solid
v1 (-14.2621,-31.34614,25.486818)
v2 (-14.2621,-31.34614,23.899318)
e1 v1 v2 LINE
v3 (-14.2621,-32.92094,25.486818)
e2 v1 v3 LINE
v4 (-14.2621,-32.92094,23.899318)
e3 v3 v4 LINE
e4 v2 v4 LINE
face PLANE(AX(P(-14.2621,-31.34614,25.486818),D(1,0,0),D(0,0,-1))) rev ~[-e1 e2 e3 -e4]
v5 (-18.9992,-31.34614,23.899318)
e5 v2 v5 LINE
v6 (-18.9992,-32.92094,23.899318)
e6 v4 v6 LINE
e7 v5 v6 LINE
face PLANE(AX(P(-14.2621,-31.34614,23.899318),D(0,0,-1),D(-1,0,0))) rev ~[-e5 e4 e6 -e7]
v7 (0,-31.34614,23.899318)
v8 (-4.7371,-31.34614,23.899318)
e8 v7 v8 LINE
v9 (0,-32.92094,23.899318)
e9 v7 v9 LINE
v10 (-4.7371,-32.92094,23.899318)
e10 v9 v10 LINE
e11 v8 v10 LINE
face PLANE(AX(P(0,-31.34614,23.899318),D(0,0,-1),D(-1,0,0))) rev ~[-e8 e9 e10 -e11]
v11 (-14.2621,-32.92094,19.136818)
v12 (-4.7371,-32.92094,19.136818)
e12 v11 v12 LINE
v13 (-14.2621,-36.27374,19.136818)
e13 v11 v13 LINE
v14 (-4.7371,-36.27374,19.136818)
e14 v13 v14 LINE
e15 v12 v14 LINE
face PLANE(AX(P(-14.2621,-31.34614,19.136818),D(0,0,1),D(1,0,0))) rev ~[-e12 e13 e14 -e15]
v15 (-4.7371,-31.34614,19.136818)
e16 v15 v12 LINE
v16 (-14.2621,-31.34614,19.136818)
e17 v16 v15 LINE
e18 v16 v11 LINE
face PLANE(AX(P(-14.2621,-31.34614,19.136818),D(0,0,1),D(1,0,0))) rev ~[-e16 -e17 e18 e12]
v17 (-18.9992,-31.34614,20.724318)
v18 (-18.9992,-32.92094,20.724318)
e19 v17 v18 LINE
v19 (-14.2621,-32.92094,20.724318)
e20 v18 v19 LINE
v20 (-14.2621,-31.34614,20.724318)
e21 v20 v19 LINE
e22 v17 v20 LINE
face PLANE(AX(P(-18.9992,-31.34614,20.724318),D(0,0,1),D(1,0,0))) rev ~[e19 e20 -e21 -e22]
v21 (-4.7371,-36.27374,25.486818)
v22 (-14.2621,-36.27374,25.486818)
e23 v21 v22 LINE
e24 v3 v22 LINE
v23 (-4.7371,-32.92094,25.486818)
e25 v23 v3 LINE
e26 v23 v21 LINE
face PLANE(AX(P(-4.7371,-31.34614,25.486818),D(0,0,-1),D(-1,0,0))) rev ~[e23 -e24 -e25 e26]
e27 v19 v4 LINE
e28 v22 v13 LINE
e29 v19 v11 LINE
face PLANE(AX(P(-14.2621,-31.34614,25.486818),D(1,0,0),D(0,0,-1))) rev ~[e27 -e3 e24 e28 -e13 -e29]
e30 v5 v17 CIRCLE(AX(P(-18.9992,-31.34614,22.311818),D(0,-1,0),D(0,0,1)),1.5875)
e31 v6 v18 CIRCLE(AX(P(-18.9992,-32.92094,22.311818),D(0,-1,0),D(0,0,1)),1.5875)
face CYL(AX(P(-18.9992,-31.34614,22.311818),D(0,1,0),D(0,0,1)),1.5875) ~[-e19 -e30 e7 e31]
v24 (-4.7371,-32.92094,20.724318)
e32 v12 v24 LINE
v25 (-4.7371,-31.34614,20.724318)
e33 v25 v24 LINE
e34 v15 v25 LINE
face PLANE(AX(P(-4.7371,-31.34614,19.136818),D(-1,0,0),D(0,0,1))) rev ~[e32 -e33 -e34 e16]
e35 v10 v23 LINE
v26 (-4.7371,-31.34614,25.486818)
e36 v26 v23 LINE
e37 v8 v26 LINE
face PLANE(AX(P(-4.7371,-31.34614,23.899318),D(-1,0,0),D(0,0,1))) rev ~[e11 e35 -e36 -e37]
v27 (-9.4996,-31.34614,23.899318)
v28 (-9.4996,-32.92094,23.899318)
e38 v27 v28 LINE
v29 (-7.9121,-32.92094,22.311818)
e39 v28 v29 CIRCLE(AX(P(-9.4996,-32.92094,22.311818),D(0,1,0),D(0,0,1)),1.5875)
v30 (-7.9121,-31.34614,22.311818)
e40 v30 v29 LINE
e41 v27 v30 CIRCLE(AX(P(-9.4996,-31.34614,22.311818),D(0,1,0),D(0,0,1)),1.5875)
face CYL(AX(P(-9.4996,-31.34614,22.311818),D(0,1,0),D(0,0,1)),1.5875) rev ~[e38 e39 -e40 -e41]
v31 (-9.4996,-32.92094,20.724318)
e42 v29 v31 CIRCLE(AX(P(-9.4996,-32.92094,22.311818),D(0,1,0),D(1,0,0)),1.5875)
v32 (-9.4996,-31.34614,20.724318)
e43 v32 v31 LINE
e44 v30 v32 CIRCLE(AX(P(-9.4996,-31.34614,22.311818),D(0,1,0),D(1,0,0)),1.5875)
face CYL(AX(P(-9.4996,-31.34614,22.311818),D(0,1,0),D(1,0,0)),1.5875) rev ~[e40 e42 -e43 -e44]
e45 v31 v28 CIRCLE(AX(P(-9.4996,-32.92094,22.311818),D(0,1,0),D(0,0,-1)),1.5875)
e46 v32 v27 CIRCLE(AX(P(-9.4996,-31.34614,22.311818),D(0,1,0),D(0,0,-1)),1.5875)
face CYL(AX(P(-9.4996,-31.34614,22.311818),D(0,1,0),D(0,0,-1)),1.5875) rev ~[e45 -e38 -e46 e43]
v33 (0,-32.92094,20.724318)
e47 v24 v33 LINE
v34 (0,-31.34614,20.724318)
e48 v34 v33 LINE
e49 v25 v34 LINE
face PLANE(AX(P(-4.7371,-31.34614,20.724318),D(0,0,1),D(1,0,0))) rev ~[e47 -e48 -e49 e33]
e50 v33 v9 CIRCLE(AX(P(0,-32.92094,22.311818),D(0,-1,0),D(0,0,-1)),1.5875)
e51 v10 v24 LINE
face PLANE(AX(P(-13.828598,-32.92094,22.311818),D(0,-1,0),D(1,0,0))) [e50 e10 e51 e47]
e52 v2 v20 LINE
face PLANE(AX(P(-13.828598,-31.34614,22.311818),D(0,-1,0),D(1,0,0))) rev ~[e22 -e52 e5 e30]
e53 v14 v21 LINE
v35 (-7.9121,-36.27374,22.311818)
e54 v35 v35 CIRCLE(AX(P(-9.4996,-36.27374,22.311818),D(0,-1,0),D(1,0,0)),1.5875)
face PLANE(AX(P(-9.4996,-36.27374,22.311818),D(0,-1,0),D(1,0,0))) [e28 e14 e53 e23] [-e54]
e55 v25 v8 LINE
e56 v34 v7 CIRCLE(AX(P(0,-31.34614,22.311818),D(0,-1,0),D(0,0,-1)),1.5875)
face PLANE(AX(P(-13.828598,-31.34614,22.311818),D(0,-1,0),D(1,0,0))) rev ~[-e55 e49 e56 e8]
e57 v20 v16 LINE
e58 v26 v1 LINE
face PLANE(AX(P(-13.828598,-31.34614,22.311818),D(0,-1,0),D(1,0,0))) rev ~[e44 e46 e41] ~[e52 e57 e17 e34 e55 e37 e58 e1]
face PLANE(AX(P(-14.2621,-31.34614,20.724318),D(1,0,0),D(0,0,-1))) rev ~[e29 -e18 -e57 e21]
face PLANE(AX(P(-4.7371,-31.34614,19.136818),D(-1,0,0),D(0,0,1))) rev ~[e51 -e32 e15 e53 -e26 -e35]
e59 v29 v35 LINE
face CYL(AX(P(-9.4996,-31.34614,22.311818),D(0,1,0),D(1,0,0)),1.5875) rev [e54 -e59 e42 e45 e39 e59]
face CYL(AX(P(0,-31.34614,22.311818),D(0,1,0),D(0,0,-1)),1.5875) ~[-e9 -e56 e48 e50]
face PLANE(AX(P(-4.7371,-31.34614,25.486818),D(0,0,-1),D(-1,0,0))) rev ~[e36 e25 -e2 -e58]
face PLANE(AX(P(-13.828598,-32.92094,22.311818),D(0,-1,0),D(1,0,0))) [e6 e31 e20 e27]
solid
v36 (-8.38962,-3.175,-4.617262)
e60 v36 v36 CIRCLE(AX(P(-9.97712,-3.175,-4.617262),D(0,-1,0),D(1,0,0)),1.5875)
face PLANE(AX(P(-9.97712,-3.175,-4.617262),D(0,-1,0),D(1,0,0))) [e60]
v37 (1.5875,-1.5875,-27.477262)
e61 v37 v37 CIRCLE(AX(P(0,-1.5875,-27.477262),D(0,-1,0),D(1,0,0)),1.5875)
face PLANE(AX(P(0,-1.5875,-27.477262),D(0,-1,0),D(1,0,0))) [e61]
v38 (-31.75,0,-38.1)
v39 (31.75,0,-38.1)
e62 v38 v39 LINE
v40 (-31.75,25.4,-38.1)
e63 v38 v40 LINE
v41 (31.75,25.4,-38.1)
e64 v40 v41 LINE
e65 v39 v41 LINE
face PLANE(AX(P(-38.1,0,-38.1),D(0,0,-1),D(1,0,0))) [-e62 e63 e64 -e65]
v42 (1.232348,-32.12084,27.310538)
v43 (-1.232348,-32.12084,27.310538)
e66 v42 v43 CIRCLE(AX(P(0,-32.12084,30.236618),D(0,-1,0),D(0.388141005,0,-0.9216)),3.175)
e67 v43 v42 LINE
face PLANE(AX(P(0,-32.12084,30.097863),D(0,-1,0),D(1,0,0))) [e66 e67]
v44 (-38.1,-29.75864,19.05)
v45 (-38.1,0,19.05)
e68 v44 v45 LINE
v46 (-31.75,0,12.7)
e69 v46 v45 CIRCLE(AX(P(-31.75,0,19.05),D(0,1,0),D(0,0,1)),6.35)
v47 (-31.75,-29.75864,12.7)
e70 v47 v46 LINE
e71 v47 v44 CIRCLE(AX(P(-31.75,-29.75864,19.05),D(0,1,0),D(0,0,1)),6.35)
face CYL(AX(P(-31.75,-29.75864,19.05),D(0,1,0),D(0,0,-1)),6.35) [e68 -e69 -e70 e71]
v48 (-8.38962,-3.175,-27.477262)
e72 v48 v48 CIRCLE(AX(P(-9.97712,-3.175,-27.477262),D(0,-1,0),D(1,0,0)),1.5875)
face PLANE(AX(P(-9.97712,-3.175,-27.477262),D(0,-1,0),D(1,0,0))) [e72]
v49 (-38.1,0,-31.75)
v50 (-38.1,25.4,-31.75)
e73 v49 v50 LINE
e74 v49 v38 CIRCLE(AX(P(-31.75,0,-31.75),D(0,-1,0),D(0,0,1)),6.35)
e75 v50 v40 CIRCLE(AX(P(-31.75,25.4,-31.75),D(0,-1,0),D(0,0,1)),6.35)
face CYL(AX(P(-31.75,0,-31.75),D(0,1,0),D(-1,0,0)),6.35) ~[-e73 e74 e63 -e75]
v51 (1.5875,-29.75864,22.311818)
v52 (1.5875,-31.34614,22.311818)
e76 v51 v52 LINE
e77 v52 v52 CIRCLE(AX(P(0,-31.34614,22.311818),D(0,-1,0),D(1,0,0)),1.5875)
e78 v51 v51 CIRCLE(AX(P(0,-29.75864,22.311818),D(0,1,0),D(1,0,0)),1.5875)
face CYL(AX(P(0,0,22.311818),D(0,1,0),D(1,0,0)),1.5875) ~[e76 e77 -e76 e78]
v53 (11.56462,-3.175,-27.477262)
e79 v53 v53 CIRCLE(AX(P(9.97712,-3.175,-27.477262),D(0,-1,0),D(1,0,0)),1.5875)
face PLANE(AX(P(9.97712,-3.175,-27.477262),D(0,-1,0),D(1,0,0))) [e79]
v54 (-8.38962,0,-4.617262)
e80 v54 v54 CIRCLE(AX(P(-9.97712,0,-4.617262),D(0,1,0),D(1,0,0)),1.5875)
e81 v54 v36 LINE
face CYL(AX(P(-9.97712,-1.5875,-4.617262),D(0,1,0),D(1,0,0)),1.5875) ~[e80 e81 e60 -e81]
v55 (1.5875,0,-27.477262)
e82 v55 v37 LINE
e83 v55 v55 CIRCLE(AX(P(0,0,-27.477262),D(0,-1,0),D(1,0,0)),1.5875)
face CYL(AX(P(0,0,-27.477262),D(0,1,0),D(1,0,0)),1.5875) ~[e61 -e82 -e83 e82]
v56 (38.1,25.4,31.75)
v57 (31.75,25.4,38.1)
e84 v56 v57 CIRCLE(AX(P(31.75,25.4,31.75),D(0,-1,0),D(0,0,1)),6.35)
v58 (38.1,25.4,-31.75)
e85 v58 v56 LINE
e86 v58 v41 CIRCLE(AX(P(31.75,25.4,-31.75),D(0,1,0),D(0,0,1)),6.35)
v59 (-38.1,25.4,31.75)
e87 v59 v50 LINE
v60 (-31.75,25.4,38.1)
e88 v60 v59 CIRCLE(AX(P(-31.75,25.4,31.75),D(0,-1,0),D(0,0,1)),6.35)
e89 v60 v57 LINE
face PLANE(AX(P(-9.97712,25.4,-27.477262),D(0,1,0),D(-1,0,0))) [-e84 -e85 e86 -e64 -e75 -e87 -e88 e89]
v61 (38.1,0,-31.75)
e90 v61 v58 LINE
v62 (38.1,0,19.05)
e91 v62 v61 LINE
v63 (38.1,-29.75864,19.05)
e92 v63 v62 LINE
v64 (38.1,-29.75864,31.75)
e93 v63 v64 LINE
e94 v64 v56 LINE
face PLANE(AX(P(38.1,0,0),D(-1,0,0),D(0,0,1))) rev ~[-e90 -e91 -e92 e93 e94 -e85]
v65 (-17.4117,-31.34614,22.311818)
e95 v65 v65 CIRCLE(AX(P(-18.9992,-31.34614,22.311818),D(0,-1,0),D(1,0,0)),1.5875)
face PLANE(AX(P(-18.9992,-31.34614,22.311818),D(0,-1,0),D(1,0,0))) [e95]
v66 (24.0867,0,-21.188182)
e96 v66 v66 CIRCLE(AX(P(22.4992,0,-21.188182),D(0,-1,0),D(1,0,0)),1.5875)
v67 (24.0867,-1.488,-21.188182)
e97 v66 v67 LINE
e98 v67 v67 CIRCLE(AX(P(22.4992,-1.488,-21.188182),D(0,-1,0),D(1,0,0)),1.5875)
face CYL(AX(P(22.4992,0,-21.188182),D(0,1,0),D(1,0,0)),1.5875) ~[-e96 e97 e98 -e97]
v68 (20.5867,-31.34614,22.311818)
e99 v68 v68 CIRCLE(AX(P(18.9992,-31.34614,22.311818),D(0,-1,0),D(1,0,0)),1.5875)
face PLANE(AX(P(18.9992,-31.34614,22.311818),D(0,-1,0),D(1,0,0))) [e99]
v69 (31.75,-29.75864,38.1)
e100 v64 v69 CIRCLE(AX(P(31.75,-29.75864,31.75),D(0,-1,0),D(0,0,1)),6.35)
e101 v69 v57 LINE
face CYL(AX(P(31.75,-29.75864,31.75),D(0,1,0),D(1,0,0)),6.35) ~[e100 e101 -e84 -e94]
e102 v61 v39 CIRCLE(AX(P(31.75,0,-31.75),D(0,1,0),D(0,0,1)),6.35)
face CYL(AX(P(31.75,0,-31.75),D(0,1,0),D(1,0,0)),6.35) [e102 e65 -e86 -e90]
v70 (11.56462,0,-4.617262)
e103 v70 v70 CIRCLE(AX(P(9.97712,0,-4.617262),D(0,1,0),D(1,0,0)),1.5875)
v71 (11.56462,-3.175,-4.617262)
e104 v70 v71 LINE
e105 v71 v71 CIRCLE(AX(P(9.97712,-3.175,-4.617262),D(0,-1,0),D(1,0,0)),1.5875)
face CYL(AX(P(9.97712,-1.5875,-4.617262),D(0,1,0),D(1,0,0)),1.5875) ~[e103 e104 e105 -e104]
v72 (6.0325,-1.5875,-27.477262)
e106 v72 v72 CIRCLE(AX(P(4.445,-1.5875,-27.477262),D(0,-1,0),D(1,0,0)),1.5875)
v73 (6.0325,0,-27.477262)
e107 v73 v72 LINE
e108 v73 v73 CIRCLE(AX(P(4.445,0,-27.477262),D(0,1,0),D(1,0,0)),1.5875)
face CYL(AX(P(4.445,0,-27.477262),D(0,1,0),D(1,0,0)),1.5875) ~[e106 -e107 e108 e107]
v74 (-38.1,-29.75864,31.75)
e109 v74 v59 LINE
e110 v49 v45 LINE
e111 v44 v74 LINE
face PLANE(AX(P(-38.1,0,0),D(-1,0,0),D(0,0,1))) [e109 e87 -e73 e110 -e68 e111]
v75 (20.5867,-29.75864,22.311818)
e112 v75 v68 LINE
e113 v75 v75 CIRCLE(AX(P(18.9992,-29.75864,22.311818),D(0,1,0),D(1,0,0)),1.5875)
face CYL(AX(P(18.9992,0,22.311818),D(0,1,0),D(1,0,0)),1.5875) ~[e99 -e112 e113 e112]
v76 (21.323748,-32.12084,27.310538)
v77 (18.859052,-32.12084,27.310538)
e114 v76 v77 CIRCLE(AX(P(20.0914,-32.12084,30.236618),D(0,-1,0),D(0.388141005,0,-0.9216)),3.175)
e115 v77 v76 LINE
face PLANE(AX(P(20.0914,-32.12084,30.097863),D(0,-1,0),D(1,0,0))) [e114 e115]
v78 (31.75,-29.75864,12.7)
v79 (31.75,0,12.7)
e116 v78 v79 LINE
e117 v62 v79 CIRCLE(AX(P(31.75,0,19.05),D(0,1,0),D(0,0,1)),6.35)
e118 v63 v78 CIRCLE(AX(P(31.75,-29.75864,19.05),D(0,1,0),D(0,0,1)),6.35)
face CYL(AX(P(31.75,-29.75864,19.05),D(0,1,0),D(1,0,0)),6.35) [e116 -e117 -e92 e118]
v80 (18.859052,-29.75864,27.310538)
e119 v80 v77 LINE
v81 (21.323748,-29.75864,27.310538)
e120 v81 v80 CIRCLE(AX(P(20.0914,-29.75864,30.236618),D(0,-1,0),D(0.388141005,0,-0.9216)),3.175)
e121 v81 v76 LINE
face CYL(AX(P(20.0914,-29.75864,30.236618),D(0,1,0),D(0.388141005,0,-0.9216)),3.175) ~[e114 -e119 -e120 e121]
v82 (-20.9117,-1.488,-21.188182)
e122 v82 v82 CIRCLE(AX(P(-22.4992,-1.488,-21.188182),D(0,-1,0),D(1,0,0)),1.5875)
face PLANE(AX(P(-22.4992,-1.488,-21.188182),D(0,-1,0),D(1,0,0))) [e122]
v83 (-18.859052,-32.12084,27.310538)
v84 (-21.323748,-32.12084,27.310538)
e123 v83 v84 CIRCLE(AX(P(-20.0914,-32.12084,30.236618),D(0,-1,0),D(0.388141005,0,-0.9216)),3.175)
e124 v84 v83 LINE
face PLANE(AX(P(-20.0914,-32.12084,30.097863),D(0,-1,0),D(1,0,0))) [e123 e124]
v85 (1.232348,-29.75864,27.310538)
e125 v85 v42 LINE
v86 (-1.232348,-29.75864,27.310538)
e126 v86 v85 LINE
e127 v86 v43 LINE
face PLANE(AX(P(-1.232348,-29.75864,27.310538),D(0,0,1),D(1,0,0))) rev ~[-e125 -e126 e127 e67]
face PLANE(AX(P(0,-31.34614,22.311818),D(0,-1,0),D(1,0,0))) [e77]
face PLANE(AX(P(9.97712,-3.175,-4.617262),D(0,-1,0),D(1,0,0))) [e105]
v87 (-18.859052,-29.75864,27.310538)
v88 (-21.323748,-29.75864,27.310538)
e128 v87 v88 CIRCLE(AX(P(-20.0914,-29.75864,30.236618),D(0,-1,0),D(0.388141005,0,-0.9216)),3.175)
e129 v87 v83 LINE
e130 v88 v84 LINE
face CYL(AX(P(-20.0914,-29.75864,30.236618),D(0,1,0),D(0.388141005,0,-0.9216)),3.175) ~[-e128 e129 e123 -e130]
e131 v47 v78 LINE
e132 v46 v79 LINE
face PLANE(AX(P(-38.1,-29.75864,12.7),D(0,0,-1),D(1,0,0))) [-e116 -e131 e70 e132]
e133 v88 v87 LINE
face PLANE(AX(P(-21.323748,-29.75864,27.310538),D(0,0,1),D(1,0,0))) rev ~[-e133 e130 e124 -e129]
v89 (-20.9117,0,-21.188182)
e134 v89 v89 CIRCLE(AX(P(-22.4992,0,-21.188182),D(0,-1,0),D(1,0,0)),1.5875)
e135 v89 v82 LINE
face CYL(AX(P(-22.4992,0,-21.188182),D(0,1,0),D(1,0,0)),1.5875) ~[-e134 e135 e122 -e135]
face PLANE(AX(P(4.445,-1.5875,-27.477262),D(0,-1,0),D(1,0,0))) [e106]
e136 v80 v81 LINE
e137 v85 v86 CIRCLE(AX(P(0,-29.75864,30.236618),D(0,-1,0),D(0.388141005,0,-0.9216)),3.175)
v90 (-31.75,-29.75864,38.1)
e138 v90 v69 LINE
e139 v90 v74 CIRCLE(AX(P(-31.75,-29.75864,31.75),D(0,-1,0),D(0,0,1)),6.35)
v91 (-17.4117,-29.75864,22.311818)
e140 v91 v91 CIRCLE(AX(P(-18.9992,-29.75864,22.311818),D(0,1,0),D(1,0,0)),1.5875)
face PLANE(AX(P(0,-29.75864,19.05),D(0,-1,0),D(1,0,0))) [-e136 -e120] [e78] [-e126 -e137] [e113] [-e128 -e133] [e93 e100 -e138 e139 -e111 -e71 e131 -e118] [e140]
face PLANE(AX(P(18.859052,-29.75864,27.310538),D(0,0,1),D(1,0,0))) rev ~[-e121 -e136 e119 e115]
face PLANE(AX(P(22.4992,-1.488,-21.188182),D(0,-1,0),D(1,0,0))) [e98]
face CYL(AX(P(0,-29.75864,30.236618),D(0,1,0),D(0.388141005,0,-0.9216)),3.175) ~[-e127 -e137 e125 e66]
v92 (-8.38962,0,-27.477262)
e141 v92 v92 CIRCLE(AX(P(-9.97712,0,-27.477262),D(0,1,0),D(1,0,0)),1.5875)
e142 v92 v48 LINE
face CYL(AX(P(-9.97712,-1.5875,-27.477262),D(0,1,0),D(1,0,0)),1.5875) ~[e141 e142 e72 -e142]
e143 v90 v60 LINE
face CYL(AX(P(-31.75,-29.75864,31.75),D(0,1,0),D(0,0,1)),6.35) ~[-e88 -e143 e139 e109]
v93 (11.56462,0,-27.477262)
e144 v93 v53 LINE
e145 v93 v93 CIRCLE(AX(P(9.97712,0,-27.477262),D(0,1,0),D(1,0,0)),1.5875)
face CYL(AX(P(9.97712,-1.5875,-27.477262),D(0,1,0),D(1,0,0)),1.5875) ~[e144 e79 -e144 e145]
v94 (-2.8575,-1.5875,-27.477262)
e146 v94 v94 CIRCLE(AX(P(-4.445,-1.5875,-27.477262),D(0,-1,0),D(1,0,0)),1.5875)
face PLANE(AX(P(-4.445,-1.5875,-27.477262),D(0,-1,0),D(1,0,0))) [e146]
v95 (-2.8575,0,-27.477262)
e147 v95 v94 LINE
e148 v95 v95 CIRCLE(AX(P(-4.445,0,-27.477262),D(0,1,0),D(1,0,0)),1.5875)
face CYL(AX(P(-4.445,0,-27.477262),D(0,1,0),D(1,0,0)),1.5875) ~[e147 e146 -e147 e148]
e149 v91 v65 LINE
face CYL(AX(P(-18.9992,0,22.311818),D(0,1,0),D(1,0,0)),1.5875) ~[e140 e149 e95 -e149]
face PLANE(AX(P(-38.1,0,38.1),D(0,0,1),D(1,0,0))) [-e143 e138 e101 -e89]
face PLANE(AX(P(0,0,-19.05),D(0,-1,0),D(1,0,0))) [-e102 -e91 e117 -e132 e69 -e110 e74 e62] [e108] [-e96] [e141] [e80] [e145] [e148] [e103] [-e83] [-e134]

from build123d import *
from build123d import SkipClean  # not in build123d's __all__

# Parameters (mm, degrees)
F0_W      = 76.2
F0_H      = 38.1
F0_R      = 1.5875
F1_DEPTH  = 25.4
F2_R      = 1.5875
F3_DEPTH  = 1.5875
F4_R      = 1.5875
F5_DEPTH  = 31.34614
F6_W      = 76.2
F6_H      = 38.1
F7_DEPTH  = 29.75864
F8_R      = 1.5875
F9_DEPTH  = 1.5875
F10_R     = 1.5875
F11_DEPTH = 25.4
F12_W     = 76.2
F12_H     = 12.7
F13_DEPTH = 29.75864
F14_R     = 6.35
F16_DEPTH = 1.5748
F17_R     = 1.5875
F18_DEPTH = 4.9276
F19_R     = 1.5875
F20_DEPTH = 1.5875
F22_DEPTH = 2.3622
F23_R     = 1.5875
F24_DEPTH = 1.488


# Not quite as in the source:
# - a feature names something its author has since deleted; it is built from what else it names


with BuildPart() as f1:
    # F0 (on Front) → F1 (new body)
    with BuildSketch(Plane.XZ):
        with Locations((0, -19.05)):
            Rectangle(F0_W, F0_H)
        with Locations((-9.97712, -27.4772621454)):
            Circle(F0_R, mode=Mode.SUBTRACT)
        with Locations((-4.445, -27.4772621454)):
            Circle(F0_R, mode=Mode.SUBTRACT)
        with Locations((-9.97712, -4.6172621454)):
            Circle(F0_R, mode=Mode.SUBTRACT)
        with Locations((4.445, -27.4772621454)):
            Circle(F0_R, mode=Mode.SUBTRACT)
        with Locations((9.97712, -27.4772621454)):
            Circle(F0_R, mode=Mode.SUBTRACT)
        with Locations((9.97712, -4.6172621454)):
            Circle(F0_R, mode=Mode.SUBTRACT)
        with Locations((0, 19.05)):
            Rectangle(F0_W, F0_H)
        with Locations((-18.9992, 22.3118178546)):
            Circle(F0_R, mode=Mode.SUBTRACT)
        with Locations((0, 22.3118178546)):
            Circle(F0_R, mode=Mode.SUBTRACT)
        with Locations((18.9992, 22.3118178546)):
            Circle(F0_R, mode=Mode.SUBTRACT)
    extrude(amount=-F1_DEPTH)

    # F2 (on Front) → F3 (join)
    with BuildSketch(Plane.XZ):
        with Locations((9.97712, -4.6172621454)):
            Circle(F2_R)
        with Locations((-9.97712, -4.6172621454)):
            Circle(F2_R)
        with Locations((-9.97712, -27.4772621454)):
            Circle(F2_R)
        with Locations((-4.445, -27.4772621454)):
            Circle(F2_R)
        with Locations((4.445, -27.4772621454)):
            Circle(F2_R)
        with Locations((9.97712, -27.4772621454)):
            Circle(F2_R)
    extrude(amount=F3_DEPTH)

    # F4 (on Front) → F5 (join)
    with BuildSketch(Plane.XZ):
        with Locations((-18.9992, 22.3118178546)):
            Circle(F4_R)
        with Locations((0, 22.3118178546)):
            Circle(F4_R)
        with Locations((18.9992, 22.3118178546)):
            Circle(F4_R)
    extrude(amount=F5_DEPTH)

    # F6 (on Front) → F7 (join)
    with BuildSketch(Plane.XZ):
        with Locations((0, 19.05)):
            Rectangle(F6_W, F6_H)
    extrude(amount=F7_DEPTH)

    # F8 (on face) → F9 (join)
    with BuildSketch(Plane.XZ.offset(1.5875)):
        with Locations((-9.97712, -4.6172621454)):
            Circle(F8_R)
        with Locations((-9.97712, -27.4772621454)):
            Circle(F8_R)
        with Locations((9.97712, -27.4772621454)):
            Circle(F8_R)
        with Locations((9.97712, -4.6172621454)):
            Circle(F8_R)
    extrude(amount=F9_DEPTH)

    # F10 (on face) → F11 (join, through all)
    with BuildSketch(Plane(origin=(0, 25.4, 0), x_dir=(-1, 0, 0), z_dir=(0, 1, 0))):
        with Locations((9.97712, -27.4772621454)):
            Circle(F10_R)
        with Locations((4.445, -27.4772621454)):
            Circle(F10_R)
        with Locations((-4.445, -27.4772621454)):
            Circle(F10_R)
        with Locations((-9.97712, -27.4772621454)):
            Circle(F10_R)
        with Locations((9.97712, -4.6172621454)):
            Circle(F10_R)
        with Locations((-9.97712, -4.6172621454)):
            Circle(F10_R)
        with Locations((18.9992, 22.3118178546)):
            Circle(F10_R)
        with Locations((0, 22.3118178546)):
            Circle(F10_R)
        with Locations((-18.9992, 22.3118178546)):
            Circle(F10_R)
    extrude(amount=-F11_DEPTH)

    # F12 (on face) → F13 (cut, through all)
    with BuildSketch(Plane.XZ.offset(29.75864)):
        with Locations((0, 6.35)):
            Rectangle(F12_W, F12_H)
    extrude(amount=-F13_DEPTH, mode=Mode.SUBTRACT)

    # F14
    f14_edges = [f1.edges().sort_by_distance(p)[0] for p in [
        (-38.1, 12.7, -38.1),
        (38.1, 12.7, -38.1),
        (38.1, -14.87932, 12.7),
        (38.1, -2.17932, 38.1),
        (-38.1, -14.87932, 12.7),
        (-38.1, -2.17932, 38.1),
    ]]
    fillet(f14_edges, radius=F14_R)

    # F19 (on face) → F20 (join)
    with BuildSketch(Plane.XZ):
        with Locations((0, -27.4772621454)):
            Circle(F19_R)
    extrude(amount=F20_DEPTH)

    # F21 (on face) → F22 (join)
    with BuildSketch(Plane.XZ.offset(29.75864)):
        with BuildLine():
            ThreePointArc((21.3237476918, 27.3105378546), (20.0914, 33.4116178546), (18.8590523082, 27.3105378546))
            Line((18.8590523082, 27.3105378546), (21.3237476918, 27.3105378546))
        make_face()
        with BuildLine():
            Line((-21.3237476918, 27.3105378546), (-18.8590523082, 27.3105378546))
            ThreePointArc((-18.8590523082, 27.3105378546), (-20.0914, 33.4116178546), (-21.3237476918, 27.3105378546))
        make_face()
        with BuildLine():
            Line((-1.2323476918, 27.3105378546), (1.2323476918, 27.3105378546))
            ThreePointArc((1.2323476918, 27.3105378546), (0, 33.4116178546), (-1.2323476918, 27.3105378546))
        make_face()
    extrude(amount=F22_DEPTH)

    # F23 (on face) → F24 (join)
    with BuildSketch(Plane.XZ):
        with Locations((-22.4992, -21.1881821454)):
            Circle(F23_R)
        with Locations((22.4992, -21.1881821454)):
            Circle(F23_R)
    extrude(amount=F24_DEPTH)


with BuildPart() as f16:
    # F15 (on face) → F16 (new body)
    with BuildSketch(Plane.XZ.offset(31.34614)):
        with BuildLine():
            Line((-14.2621, 19.1368178546), (-9.4996, 19.1368178546))
            Line((-9.4996, 19.1368178546), (-9.4996, 20.7243178546))
            ThreePointArc((-9.4996, 20.7243178546), (-11.0871, 22.3118178546), (-9.4996, 23.8993178546))
            Line((-9.4996, 23.8993178546), (-9.4996, 25.4868178546))
            Line((-9.4996, 25.4868178546), (-14.2621, 25.4868178546))
            Line((-14.2621, 25.4868178546), (-14.2621, 23.8993178546))
            Line((-14.2621, 23.8993178546), (-18.9992, 23.8993178546))
            ThreePointArc((-18.9992, 23.8993178546), (-17.8766679849, 23.4343498698), (-17.4117, 22.3118178546))
            ThreePointArc((-17.4117, 22.3118178546), (-17.8766679849, 21.1892858395), (-18.9992, 20.7243178546))
            Line((-18.9992, 20.7243178546), (-14.2621, 20.7243178546))
            Line((-14.2621, 20.7243178546), (-14.2621, 19.1368178546))
        make_face()
        with BuildLine():
            Line((-4.7371, 20.7243178546), (0, 20.7243178546))
            ThreePointArc((0, 20.7243178546), (1.5875, 22.3118178546), (0, 23.8993178546))
            Line((0, 23.8993178546), (-4.7371, 23.8993178546))
            Line((-4.7371, 23.8993178546), (-4.7371, 25.4868178546))
            Line((-4.7371, 25.4868178546), (-9.4996, 25.4868178546))
            Line((-9.4996, 25.4868178546), (-9.4996, 23.8993178546))
            ThreePointArc((-9.4996, 23.8993178546), (-8.3770679849, 23.4343498698), (-7.9121, 22.3118178546))
            ThreePointArc((-7.9121, 22.3118178546), (-8.3770679849, 21.1892858395), (-9.4996, 20.7243178546))
            Line((-9.4996, 20.7243178546), (-9.4996, 19.1368178546))
            Line((-9.4996, 19.1368178546), (-4.7371, 19.1368178546))
            Line((-4.7371, 19.1368178546), (-4.7371, 20.7243178546))
        make_face()
        with BuildLine():
            ThreePointArc((-18.9992, 23.8993178546), (-20.5867, 22.3118178546), (-18.9992, 20.7243178546))
            ThreePointArc((-18.9992, 20.7243178546), (-17.8766679849, 21.1892858395), (-17.4117, 22.3118178546))
            ThreePointArc((-17.4117, 22.3118178546), (-17.8766679849, 23.4343498698), (-18.9992, 23.8993178546))
        make_face()
    extrude(amount=F16_DEPTH)

    # F17 (on face) → F18 (join)
    with BuildSketch(Plane.XZ.offset(31.34614)):
        Polygon((-4.7371, 23.8993178546), (-4.7371, 25.4868178546), (-14.2621, 25.4868178546), (-14.2621, 23.8993178546), (-14.2621, 20.7243178546), (-14.2621, 19.1368178546), (-4.7371, 19.1368178546), (-4.7371, 20.7243178546), align=None)
        with Locations((-9.4996, 22.3118178546)):
            Circle(F17_R, mode=Mode.SUBTRACT)
    with SkipClean():  # cleaning this boolean's faces spoils the solid; the shape is the same uncleaned
        extrude(amount=F18_DEPTH)


solid = Compound([f1.part, f16.part])
